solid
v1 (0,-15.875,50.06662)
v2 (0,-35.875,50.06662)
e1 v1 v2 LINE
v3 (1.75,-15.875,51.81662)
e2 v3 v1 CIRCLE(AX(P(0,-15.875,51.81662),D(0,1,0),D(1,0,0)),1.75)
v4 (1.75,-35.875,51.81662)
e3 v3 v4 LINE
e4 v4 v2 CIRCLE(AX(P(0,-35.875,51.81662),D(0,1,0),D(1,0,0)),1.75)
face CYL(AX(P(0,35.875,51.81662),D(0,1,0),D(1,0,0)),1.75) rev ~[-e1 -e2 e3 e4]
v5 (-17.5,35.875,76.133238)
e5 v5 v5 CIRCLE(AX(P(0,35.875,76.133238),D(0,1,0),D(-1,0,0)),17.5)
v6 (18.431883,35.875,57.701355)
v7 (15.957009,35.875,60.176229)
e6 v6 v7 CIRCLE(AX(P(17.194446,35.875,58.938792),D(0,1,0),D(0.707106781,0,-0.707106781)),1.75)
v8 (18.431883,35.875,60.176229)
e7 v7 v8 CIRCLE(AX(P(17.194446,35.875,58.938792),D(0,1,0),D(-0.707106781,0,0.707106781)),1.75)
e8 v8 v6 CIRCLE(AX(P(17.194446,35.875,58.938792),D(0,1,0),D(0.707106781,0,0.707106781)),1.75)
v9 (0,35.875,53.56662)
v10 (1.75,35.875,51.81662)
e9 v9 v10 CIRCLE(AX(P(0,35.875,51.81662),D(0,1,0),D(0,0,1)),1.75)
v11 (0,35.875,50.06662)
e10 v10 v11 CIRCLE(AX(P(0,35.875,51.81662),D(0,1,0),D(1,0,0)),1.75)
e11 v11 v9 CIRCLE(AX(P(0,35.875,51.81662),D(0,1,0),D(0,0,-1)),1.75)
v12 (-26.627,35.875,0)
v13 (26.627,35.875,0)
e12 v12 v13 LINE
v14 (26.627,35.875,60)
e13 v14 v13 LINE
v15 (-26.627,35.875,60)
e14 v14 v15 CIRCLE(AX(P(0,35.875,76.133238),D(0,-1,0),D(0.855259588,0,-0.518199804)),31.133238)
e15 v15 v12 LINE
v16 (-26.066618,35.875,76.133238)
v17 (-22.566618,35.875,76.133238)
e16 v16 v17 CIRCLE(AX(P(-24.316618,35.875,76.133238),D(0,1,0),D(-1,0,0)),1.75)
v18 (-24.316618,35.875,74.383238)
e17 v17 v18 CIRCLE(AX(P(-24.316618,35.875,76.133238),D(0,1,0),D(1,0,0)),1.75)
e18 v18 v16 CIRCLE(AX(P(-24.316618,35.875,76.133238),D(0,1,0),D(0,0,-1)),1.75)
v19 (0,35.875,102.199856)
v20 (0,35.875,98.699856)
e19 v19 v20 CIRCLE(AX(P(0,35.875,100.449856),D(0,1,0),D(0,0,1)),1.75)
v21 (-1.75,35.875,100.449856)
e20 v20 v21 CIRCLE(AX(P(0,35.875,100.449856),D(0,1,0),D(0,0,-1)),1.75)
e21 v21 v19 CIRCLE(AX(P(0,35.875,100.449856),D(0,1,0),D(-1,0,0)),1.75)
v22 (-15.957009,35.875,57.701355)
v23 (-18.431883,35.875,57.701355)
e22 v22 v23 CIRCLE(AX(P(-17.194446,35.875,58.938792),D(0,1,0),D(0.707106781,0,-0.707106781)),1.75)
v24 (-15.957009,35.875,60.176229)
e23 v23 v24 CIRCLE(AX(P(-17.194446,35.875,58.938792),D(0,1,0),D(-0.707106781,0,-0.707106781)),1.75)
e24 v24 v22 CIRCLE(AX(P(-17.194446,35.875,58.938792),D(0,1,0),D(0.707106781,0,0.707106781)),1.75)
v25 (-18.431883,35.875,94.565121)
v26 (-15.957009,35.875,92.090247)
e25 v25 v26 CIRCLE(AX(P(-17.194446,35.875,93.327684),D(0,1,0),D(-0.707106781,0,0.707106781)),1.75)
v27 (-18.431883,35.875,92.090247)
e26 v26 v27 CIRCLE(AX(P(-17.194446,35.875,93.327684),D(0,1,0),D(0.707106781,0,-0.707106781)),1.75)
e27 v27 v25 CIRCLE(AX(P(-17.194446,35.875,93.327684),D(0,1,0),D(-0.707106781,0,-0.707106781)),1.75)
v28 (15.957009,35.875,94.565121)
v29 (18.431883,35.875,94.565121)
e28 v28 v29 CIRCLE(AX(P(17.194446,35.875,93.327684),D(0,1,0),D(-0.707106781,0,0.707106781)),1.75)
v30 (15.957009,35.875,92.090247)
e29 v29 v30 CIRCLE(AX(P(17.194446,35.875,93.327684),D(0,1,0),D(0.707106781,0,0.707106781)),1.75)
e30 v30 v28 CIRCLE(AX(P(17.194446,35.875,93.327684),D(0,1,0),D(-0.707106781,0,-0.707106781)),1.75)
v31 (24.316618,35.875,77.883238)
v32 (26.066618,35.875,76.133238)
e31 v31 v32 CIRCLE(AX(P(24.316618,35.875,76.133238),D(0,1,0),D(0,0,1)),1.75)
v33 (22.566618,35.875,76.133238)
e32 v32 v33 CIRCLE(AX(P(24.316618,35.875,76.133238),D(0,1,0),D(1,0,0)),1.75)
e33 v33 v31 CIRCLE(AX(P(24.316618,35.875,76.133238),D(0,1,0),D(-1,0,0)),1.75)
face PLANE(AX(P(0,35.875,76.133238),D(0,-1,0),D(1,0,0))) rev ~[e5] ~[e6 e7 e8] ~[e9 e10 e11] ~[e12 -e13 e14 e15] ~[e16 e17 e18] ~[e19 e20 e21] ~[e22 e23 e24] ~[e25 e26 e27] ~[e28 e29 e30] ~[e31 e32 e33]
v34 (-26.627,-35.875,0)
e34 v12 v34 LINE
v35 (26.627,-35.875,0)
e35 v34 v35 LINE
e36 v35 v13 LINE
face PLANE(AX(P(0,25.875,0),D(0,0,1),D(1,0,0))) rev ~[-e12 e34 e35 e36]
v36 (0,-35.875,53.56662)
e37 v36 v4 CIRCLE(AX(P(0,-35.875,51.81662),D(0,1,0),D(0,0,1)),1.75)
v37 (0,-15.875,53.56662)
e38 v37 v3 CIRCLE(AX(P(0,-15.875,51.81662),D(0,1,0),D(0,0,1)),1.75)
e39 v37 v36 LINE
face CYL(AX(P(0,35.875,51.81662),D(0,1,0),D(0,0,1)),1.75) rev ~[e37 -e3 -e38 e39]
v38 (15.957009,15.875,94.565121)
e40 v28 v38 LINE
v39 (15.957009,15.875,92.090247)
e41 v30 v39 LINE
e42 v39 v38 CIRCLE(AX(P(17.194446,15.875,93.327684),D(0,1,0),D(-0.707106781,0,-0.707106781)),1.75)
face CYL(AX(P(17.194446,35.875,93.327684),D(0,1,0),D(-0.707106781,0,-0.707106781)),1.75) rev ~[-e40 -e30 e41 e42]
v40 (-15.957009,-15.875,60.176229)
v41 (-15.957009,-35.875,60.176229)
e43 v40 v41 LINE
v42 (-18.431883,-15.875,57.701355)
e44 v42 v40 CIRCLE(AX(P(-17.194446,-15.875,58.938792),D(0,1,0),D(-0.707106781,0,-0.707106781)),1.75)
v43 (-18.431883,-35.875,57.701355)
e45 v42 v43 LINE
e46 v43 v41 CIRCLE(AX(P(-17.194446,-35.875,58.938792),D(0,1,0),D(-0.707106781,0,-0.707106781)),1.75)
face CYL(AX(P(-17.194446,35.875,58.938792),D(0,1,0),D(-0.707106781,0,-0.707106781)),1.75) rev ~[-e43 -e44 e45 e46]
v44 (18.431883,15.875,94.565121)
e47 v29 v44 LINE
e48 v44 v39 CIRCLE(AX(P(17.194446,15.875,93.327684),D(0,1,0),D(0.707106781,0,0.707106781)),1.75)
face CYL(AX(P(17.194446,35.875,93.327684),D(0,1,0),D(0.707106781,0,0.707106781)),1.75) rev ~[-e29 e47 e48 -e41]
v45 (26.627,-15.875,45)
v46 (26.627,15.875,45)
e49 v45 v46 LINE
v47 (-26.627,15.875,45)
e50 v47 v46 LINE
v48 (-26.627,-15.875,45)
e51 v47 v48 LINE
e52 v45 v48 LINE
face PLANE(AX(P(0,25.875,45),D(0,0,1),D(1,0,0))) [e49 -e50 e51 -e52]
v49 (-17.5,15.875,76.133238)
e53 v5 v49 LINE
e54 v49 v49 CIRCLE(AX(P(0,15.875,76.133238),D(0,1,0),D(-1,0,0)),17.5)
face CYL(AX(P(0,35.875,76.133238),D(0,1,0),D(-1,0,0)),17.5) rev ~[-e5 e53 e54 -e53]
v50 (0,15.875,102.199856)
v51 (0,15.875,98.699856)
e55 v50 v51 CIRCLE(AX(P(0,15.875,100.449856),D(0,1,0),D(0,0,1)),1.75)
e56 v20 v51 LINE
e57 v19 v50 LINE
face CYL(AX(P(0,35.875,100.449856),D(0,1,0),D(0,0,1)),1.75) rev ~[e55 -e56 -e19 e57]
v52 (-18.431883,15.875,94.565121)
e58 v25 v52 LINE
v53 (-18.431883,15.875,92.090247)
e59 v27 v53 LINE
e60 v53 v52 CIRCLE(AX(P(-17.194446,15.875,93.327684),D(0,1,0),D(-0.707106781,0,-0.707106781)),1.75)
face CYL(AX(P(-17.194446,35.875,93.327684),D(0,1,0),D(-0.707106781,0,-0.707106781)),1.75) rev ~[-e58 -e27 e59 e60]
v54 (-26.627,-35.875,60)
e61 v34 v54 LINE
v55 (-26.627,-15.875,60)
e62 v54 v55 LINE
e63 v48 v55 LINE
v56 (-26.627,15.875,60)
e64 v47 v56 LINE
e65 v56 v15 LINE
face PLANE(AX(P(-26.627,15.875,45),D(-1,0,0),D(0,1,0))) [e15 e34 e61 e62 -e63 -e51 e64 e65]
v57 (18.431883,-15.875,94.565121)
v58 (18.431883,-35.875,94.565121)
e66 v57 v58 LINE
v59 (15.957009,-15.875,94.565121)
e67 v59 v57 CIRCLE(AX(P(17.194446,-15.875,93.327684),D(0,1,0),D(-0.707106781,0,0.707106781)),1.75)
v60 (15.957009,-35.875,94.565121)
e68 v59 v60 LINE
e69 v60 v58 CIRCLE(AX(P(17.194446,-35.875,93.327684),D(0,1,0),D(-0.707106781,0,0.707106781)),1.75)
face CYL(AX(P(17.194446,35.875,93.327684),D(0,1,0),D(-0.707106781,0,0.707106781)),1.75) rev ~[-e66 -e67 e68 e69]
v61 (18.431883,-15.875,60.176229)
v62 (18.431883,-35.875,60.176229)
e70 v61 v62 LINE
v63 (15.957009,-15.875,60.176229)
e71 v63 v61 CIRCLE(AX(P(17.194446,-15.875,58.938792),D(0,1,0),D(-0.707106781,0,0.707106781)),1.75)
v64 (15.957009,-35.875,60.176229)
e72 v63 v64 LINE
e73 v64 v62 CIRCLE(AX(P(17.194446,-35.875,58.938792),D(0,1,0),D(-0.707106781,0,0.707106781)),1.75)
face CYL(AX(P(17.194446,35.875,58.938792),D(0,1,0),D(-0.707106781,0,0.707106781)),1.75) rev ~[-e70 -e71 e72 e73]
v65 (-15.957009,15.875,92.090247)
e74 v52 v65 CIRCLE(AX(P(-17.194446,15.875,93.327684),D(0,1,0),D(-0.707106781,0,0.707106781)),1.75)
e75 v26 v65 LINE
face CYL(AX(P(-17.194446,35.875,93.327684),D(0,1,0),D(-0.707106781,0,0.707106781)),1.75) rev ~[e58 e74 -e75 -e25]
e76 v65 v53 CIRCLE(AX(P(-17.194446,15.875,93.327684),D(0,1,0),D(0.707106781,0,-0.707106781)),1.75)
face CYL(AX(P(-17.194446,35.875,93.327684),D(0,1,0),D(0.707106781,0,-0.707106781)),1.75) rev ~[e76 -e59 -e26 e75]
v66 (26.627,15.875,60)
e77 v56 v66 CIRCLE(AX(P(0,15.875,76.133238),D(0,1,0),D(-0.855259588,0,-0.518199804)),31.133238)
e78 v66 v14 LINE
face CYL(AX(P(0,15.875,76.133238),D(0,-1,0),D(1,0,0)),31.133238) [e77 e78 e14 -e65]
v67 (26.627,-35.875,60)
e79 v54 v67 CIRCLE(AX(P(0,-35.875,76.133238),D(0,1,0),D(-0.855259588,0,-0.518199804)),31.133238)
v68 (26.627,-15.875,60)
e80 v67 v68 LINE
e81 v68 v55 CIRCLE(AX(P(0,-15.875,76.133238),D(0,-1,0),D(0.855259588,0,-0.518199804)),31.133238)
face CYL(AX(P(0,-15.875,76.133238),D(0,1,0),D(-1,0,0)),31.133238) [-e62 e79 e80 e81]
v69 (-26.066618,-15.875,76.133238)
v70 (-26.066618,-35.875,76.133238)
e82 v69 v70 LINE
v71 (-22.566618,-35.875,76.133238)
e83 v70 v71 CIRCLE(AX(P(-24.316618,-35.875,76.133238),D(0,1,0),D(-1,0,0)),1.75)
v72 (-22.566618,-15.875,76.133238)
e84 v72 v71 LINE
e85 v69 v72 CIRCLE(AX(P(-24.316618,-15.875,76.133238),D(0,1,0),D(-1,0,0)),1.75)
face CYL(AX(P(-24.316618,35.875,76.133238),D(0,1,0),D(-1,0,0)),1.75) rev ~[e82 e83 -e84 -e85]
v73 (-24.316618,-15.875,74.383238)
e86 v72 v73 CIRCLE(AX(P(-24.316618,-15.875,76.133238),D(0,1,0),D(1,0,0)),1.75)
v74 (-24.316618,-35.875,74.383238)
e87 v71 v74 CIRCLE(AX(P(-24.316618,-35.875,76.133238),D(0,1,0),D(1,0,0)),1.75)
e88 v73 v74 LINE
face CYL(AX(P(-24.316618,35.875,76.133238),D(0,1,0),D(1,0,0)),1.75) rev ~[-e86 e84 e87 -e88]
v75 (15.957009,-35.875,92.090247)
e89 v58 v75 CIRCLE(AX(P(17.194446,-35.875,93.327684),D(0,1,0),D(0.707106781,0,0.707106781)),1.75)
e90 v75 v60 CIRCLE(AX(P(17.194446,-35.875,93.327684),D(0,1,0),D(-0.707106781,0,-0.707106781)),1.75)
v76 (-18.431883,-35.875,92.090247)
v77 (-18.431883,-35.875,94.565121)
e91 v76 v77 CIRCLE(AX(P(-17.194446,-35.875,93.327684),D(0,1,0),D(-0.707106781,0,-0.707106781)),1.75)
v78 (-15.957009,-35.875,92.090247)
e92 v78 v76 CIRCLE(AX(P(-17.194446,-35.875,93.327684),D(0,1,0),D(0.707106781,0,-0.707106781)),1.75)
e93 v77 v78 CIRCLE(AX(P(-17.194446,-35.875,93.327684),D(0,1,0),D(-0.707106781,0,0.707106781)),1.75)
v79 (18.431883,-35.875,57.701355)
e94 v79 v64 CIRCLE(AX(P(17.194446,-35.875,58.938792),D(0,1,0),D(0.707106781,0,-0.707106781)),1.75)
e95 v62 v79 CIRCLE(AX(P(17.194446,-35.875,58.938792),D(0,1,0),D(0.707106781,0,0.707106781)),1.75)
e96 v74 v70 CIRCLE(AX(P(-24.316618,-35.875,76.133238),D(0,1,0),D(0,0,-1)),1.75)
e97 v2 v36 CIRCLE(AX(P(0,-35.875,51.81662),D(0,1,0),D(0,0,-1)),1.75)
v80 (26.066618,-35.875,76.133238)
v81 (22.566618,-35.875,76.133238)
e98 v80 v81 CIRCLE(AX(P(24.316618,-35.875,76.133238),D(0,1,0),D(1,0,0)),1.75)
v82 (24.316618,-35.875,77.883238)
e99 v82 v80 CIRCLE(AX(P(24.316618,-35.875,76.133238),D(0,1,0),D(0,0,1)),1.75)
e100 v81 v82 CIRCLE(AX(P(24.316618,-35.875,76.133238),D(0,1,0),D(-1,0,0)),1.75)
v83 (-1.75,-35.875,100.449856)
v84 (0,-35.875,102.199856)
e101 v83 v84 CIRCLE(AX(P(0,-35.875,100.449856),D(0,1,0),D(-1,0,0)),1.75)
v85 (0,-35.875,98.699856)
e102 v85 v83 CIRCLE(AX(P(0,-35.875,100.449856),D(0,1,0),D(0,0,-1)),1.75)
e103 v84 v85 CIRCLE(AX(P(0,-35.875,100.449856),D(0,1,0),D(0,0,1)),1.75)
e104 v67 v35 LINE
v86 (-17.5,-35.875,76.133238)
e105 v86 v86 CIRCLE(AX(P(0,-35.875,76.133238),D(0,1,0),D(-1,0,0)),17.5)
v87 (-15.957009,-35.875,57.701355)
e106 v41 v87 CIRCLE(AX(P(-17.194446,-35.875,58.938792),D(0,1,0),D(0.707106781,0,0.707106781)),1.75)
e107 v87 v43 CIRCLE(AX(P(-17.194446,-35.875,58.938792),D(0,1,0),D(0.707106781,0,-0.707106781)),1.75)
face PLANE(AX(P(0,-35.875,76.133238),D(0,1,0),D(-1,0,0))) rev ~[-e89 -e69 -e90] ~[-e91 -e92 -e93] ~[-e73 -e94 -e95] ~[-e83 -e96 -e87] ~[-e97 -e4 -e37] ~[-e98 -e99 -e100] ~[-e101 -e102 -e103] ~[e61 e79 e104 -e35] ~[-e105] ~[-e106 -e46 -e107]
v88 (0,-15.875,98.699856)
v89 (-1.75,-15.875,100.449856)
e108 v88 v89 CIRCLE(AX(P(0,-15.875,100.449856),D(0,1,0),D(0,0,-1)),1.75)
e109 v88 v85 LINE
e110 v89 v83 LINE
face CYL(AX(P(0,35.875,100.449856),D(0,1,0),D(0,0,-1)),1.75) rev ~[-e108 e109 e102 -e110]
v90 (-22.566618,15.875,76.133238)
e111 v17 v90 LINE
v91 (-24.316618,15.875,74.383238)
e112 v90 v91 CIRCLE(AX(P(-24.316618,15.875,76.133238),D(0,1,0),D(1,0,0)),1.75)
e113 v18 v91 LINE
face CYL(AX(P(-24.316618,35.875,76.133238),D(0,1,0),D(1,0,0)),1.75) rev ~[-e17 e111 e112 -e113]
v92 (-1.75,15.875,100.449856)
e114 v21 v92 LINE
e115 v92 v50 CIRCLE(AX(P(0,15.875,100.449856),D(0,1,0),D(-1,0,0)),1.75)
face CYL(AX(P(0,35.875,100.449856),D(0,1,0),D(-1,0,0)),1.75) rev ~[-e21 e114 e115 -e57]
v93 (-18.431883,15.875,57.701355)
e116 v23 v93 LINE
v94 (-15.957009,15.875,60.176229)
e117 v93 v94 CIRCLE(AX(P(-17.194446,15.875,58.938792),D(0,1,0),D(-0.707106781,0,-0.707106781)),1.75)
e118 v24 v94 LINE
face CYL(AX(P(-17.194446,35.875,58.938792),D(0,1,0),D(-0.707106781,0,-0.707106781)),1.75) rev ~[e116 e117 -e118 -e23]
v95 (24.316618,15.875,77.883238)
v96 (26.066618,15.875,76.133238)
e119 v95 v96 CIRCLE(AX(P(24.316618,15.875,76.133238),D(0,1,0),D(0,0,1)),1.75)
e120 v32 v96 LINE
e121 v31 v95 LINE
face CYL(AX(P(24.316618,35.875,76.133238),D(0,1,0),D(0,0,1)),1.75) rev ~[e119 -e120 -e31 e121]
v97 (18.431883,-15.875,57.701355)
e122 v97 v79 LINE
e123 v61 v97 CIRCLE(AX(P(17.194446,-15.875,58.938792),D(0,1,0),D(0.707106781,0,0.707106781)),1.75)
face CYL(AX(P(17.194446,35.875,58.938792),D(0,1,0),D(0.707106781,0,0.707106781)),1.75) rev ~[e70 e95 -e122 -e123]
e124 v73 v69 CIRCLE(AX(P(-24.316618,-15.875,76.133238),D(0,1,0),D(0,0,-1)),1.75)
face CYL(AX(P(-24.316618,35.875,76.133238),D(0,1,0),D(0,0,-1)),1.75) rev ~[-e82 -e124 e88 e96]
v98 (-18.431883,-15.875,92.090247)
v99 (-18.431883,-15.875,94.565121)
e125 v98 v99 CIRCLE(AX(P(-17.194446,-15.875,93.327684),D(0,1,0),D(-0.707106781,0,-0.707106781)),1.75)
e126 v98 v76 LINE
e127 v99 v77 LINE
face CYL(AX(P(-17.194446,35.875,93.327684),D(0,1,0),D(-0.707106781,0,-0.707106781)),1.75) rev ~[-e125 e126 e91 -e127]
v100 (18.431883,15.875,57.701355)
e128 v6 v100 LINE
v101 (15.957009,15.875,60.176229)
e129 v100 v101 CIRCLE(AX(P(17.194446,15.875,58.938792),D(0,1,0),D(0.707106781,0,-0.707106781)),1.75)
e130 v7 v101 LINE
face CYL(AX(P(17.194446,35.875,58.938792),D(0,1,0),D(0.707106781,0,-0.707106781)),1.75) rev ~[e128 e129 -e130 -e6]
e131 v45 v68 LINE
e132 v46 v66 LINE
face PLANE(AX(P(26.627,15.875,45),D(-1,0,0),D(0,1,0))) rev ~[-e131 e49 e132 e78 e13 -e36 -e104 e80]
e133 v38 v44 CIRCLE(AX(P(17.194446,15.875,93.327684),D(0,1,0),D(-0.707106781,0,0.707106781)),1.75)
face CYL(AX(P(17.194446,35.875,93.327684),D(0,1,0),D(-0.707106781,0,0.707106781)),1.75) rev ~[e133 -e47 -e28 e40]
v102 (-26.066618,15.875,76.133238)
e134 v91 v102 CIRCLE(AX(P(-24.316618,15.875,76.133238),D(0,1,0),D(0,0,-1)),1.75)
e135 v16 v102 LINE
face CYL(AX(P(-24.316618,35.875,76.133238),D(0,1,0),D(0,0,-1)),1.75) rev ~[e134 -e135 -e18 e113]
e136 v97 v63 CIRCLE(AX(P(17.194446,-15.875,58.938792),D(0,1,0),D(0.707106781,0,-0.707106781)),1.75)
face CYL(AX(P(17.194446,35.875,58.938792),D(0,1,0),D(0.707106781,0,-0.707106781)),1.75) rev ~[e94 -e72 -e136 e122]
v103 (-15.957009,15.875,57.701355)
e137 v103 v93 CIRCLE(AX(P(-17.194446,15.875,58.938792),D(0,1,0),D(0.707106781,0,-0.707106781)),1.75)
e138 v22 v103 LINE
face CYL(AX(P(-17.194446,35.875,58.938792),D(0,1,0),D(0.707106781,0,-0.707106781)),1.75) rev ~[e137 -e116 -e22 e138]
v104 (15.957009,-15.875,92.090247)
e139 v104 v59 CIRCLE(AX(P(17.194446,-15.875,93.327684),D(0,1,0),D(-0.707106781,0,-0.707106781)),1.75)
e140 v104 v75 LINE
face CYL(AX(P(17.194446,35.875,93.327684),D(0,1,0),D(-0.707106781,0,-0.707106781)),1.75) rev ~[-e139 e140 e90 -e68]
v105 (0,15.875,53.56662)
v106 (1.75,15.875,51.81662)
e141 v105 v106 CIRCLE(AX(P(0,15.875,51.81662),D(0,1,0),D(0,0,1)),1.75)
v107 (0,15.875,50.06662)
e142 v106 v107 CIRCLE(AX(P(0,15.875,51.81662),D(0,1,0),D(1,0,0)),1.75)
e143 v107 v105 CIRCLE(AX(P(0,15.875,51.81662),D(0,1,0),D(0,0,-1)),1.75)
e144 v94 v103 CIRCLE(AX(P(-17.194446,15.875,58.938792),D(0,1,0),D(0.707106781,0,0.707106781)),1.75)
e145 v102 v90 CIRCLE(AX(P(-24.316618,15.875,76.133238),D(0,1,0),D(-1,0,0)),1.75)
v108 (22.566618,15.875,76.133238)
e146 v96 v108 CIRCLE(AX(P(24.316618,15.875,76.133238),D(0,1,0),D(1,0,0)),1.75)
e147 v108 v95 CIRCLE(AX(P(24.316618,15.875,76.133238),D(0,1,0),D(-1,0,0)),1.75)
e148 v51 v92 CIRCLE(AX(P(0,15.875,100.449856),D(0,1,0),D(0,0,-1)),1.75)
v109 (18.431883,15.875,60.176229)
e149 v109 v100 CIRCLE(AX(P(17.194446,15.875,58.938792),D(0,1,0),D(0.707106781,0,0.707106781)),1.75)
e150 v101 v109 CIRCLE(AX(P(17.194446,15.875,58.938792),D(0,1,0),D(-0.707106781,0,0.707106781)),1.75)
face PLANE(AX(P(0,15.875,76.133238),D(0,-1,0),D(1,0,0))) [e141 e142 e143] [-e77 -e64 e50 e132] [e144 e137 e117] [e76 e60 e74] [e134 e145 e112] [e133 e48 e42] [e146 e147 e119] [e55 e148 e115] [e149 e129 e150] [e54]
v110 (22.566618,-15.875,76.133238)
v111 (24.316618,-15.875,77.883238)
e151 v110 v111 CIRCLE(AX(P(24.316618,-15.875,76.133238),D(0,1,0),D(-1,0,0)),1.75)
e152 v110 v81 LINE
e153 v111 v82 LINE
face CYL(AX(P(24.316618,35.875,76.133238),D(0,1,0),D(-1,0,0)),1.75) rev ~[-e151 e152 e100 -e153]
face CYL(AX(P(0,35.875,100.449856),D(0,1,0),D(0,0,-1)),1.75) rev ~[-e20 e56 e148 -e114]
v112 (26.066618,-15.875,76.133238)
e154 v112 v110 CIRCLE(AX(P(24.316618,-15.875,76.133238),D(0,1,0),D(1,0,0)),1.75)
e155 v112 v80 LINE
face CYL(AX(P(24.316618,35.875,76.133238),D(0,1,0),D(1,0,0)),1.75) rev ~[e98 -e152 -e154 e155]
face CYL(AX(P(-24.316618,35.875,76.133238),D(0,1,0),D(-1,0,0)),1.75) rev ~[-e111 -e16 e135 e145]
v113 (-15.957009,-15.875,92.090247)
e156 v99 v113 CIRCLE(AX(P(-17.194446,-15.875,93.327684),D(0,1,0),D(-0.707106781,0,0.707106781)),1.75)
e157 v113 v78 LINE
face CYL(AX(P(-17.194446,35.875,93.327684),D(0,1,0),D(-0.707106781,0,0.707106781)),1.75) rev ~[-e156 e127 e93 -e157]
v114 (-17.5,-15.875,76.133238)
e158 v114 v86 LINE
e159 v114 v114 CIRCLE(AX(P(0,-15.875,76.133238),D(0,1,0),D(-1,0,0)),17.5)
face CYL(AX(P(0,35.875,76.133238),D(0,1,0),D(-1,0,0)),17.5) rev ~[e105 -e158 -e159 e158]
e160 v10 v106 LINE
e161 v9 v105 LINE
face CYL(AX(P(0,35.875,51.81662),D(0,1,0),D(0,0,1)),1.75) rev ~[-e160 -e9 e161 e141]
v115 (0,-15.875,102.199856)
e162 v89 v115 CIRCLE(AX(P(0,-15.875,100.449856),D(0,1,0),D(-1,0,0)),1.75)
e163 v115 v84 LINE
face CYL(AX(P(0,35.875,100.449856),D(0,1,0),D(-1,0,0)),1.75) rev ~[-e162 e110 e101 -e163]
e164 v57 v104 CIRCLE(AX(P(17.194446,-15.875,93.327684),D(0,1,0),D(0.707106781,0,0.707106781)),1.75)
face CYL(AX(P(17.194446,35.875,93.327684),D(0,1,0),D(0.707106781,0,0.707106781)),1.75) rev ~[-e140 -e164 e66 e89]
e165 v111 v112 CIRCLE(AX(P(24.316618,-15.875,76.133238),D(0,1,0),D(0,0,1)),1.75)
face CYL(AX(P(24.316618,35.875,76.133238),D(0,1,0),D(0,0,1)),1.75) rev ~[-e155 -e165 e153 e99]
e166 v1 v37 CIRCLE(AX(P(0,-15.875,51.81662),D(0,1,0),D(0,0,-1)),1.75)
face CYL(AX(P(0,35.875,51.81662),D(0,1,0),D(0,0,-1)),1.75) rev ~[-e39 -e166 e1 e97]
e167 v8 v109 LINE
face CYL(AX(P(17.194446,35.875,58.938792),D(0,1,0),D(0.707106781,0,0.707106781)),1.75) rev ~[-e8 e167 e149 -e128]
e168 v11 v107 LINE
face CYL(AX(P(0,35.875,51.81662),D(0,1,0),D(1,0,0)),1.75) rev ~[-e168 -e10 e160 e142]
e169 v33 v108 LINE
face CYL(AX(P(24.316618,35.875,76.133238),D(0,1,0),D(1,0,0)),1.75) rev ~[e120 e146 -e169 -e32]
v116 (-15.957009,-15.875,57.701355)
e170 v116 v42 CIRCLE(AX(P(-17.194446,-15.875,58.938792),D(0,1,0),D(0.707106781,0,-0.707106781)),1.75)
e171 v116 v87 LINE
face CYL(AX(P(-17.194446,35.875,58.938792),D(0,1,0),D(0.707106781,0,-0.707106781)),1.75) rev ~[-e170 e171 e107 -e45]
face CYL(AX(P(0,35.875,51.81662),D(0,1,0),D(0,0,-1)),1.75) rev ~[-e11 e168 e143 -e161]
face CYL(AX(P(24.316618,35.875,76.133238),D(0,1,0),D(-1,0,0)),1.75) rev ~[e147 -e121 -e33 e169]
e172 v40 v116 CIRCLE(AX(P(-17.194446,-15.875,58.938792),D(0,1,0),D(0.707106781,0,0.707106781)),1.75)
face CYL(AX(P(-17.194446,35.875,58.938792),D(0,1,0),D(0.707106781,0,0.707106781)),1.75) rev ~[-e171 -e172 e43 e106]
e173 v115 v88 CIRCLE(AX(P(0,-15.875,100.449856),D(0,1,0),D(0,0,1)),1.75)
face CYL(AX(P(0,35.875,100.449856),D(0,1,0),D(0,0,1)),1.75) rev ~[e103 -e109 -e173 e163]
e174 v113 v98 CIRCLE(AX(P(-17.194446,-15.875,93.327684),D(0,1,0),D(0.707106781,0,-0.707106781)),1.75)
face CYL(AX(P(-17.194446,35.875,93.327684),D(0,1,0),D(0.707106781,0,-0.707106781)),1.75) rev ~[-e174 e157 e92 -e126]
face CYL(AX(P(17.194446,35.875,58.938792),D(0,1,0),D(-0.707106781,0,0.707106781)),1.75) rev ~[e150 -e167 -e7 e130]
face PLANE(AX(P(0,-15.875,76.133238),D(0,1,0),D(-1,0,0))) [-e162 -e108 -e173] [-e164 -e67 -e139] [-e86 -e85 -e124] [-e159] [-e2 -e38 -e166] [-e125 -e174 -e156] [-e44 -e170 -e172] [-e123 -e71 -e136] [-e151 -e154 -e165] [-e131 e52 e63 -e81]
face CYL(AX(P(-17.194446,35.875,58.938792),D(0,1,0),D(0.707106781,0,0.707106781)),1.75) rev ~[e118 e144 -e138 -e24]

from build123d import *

# Parameters (mm, degrees)
F0_W             = 53.254
F0_H             = 20
F0_H_2           = 31.75
F1_DEPTH         = 45
F2_W             = 53.254
F2_H             = 20
F3_DEPTH         = 15
F4_R             = 31.1332376333
F5_DEPTH         = 20
F6_R             = 31.1332376333
F7_DEPTH         = 20
F8_R             = 17.5
F9_DEPTH         = 100
F11_DEPTH        = 100
F11_COPIES_COUNT = 8


# Not quite as in the source:
# - a pattern or mirror of a feature is missing from the dataset's text; its kind, count and spacing are read off the source's solid


with BuildPart() as f1:
    # F0 (on Top) → F1 (new body)
    with BuildSketch(Plane.XY):
        with Locations((0, 25.875)):
            Rectangle(F0_W, F0_H)
        Rectangle(F0_W, F0_H_2)
        with Locations((0, -25.875)):
            Rectangle(F0_W, F0_H)
    extrude(amount=F1_DEPTH)

    # F2 (on face) → F3 (join)
    with BuildSketch(Plane.XY.offset(45)):
        with Locations((0, 25.875)):
            Rectangle(F2_W, F2_H)
        with Locations((0, -25.875)):
            Rectangle(F2_W, F2_H)
    extrude(amount=F3_DEPTH)

    # F4 (on face) → F5 (join)
    with BuildSketch(Plane.XZ.offset(-15.875)):
        with Locations((0, 76.1332376333)):
            Circle(F4_R)
    extrude(amount=-F5_DEPTH)

    # F6 (on face) → F7 (join)
    with BuildSketch(Plane(origin=(0, -15.875, 0), x_dir=(-1, 0, 0), z_dir=(0, 1, 0))):
        with Locations((0, 76.1332376333)):
            Circle(F6_R)
    extrude(amount=-F7_DEPTH)

    # F8 (on face) → F9 (cut)
    with BuildSketch(Plane(origin=(0, 35.875, 0), x_dir=(-1, 0, 0), z_dir=(0, 1, 0))):
        with Locations((0, 76.1332376333)):
            Circle(F8_R)
    extrude(amount=-F9_DEPTH, mode=Mode.SUBTRACT)

    # F10 (on face) → F11 (cut)
    with BuildSketch(Plane(origin=(0, 35.875, 0), x_dir=(-1, 0, 0), z_dir=(0, 1, 0))):
        with BuildLine():
            ThreePointArc((0, 102.19985645), (-1.75, 100.44985645), (0, 98.69985645))
            Line((0, 98.69985645), (0, 102.19985645))
        make_face()
        with BuildLine():
            Line((0, 102.19985645), (0, 98.69985645))
            ThreePointArc((0, 98.69985645), (1.2374368671, 99.2124195829), (1.75, 100.44985645))
            ThreePointArc((1.75, 100.44985645), (1.2374368671, 101.6872933171), (0, 102.19985645))
        make_face()
    f11 = extrude(amount=-F11_DEPTH, mode=Mode.SUBTRACT)

    # F11_copies: F11 ×8 about axis
    f11_copies_axis = Axis((0, 0, 76.133238), (0, 1, 0))
    for i in range(1, F11_COPIES_COUNT):
        add(f11.rotate(f11_copies_axis, i * 360 / F11_COPIES_COUNT), mode=Mode.SUBTRACT)


solid = f1.part
